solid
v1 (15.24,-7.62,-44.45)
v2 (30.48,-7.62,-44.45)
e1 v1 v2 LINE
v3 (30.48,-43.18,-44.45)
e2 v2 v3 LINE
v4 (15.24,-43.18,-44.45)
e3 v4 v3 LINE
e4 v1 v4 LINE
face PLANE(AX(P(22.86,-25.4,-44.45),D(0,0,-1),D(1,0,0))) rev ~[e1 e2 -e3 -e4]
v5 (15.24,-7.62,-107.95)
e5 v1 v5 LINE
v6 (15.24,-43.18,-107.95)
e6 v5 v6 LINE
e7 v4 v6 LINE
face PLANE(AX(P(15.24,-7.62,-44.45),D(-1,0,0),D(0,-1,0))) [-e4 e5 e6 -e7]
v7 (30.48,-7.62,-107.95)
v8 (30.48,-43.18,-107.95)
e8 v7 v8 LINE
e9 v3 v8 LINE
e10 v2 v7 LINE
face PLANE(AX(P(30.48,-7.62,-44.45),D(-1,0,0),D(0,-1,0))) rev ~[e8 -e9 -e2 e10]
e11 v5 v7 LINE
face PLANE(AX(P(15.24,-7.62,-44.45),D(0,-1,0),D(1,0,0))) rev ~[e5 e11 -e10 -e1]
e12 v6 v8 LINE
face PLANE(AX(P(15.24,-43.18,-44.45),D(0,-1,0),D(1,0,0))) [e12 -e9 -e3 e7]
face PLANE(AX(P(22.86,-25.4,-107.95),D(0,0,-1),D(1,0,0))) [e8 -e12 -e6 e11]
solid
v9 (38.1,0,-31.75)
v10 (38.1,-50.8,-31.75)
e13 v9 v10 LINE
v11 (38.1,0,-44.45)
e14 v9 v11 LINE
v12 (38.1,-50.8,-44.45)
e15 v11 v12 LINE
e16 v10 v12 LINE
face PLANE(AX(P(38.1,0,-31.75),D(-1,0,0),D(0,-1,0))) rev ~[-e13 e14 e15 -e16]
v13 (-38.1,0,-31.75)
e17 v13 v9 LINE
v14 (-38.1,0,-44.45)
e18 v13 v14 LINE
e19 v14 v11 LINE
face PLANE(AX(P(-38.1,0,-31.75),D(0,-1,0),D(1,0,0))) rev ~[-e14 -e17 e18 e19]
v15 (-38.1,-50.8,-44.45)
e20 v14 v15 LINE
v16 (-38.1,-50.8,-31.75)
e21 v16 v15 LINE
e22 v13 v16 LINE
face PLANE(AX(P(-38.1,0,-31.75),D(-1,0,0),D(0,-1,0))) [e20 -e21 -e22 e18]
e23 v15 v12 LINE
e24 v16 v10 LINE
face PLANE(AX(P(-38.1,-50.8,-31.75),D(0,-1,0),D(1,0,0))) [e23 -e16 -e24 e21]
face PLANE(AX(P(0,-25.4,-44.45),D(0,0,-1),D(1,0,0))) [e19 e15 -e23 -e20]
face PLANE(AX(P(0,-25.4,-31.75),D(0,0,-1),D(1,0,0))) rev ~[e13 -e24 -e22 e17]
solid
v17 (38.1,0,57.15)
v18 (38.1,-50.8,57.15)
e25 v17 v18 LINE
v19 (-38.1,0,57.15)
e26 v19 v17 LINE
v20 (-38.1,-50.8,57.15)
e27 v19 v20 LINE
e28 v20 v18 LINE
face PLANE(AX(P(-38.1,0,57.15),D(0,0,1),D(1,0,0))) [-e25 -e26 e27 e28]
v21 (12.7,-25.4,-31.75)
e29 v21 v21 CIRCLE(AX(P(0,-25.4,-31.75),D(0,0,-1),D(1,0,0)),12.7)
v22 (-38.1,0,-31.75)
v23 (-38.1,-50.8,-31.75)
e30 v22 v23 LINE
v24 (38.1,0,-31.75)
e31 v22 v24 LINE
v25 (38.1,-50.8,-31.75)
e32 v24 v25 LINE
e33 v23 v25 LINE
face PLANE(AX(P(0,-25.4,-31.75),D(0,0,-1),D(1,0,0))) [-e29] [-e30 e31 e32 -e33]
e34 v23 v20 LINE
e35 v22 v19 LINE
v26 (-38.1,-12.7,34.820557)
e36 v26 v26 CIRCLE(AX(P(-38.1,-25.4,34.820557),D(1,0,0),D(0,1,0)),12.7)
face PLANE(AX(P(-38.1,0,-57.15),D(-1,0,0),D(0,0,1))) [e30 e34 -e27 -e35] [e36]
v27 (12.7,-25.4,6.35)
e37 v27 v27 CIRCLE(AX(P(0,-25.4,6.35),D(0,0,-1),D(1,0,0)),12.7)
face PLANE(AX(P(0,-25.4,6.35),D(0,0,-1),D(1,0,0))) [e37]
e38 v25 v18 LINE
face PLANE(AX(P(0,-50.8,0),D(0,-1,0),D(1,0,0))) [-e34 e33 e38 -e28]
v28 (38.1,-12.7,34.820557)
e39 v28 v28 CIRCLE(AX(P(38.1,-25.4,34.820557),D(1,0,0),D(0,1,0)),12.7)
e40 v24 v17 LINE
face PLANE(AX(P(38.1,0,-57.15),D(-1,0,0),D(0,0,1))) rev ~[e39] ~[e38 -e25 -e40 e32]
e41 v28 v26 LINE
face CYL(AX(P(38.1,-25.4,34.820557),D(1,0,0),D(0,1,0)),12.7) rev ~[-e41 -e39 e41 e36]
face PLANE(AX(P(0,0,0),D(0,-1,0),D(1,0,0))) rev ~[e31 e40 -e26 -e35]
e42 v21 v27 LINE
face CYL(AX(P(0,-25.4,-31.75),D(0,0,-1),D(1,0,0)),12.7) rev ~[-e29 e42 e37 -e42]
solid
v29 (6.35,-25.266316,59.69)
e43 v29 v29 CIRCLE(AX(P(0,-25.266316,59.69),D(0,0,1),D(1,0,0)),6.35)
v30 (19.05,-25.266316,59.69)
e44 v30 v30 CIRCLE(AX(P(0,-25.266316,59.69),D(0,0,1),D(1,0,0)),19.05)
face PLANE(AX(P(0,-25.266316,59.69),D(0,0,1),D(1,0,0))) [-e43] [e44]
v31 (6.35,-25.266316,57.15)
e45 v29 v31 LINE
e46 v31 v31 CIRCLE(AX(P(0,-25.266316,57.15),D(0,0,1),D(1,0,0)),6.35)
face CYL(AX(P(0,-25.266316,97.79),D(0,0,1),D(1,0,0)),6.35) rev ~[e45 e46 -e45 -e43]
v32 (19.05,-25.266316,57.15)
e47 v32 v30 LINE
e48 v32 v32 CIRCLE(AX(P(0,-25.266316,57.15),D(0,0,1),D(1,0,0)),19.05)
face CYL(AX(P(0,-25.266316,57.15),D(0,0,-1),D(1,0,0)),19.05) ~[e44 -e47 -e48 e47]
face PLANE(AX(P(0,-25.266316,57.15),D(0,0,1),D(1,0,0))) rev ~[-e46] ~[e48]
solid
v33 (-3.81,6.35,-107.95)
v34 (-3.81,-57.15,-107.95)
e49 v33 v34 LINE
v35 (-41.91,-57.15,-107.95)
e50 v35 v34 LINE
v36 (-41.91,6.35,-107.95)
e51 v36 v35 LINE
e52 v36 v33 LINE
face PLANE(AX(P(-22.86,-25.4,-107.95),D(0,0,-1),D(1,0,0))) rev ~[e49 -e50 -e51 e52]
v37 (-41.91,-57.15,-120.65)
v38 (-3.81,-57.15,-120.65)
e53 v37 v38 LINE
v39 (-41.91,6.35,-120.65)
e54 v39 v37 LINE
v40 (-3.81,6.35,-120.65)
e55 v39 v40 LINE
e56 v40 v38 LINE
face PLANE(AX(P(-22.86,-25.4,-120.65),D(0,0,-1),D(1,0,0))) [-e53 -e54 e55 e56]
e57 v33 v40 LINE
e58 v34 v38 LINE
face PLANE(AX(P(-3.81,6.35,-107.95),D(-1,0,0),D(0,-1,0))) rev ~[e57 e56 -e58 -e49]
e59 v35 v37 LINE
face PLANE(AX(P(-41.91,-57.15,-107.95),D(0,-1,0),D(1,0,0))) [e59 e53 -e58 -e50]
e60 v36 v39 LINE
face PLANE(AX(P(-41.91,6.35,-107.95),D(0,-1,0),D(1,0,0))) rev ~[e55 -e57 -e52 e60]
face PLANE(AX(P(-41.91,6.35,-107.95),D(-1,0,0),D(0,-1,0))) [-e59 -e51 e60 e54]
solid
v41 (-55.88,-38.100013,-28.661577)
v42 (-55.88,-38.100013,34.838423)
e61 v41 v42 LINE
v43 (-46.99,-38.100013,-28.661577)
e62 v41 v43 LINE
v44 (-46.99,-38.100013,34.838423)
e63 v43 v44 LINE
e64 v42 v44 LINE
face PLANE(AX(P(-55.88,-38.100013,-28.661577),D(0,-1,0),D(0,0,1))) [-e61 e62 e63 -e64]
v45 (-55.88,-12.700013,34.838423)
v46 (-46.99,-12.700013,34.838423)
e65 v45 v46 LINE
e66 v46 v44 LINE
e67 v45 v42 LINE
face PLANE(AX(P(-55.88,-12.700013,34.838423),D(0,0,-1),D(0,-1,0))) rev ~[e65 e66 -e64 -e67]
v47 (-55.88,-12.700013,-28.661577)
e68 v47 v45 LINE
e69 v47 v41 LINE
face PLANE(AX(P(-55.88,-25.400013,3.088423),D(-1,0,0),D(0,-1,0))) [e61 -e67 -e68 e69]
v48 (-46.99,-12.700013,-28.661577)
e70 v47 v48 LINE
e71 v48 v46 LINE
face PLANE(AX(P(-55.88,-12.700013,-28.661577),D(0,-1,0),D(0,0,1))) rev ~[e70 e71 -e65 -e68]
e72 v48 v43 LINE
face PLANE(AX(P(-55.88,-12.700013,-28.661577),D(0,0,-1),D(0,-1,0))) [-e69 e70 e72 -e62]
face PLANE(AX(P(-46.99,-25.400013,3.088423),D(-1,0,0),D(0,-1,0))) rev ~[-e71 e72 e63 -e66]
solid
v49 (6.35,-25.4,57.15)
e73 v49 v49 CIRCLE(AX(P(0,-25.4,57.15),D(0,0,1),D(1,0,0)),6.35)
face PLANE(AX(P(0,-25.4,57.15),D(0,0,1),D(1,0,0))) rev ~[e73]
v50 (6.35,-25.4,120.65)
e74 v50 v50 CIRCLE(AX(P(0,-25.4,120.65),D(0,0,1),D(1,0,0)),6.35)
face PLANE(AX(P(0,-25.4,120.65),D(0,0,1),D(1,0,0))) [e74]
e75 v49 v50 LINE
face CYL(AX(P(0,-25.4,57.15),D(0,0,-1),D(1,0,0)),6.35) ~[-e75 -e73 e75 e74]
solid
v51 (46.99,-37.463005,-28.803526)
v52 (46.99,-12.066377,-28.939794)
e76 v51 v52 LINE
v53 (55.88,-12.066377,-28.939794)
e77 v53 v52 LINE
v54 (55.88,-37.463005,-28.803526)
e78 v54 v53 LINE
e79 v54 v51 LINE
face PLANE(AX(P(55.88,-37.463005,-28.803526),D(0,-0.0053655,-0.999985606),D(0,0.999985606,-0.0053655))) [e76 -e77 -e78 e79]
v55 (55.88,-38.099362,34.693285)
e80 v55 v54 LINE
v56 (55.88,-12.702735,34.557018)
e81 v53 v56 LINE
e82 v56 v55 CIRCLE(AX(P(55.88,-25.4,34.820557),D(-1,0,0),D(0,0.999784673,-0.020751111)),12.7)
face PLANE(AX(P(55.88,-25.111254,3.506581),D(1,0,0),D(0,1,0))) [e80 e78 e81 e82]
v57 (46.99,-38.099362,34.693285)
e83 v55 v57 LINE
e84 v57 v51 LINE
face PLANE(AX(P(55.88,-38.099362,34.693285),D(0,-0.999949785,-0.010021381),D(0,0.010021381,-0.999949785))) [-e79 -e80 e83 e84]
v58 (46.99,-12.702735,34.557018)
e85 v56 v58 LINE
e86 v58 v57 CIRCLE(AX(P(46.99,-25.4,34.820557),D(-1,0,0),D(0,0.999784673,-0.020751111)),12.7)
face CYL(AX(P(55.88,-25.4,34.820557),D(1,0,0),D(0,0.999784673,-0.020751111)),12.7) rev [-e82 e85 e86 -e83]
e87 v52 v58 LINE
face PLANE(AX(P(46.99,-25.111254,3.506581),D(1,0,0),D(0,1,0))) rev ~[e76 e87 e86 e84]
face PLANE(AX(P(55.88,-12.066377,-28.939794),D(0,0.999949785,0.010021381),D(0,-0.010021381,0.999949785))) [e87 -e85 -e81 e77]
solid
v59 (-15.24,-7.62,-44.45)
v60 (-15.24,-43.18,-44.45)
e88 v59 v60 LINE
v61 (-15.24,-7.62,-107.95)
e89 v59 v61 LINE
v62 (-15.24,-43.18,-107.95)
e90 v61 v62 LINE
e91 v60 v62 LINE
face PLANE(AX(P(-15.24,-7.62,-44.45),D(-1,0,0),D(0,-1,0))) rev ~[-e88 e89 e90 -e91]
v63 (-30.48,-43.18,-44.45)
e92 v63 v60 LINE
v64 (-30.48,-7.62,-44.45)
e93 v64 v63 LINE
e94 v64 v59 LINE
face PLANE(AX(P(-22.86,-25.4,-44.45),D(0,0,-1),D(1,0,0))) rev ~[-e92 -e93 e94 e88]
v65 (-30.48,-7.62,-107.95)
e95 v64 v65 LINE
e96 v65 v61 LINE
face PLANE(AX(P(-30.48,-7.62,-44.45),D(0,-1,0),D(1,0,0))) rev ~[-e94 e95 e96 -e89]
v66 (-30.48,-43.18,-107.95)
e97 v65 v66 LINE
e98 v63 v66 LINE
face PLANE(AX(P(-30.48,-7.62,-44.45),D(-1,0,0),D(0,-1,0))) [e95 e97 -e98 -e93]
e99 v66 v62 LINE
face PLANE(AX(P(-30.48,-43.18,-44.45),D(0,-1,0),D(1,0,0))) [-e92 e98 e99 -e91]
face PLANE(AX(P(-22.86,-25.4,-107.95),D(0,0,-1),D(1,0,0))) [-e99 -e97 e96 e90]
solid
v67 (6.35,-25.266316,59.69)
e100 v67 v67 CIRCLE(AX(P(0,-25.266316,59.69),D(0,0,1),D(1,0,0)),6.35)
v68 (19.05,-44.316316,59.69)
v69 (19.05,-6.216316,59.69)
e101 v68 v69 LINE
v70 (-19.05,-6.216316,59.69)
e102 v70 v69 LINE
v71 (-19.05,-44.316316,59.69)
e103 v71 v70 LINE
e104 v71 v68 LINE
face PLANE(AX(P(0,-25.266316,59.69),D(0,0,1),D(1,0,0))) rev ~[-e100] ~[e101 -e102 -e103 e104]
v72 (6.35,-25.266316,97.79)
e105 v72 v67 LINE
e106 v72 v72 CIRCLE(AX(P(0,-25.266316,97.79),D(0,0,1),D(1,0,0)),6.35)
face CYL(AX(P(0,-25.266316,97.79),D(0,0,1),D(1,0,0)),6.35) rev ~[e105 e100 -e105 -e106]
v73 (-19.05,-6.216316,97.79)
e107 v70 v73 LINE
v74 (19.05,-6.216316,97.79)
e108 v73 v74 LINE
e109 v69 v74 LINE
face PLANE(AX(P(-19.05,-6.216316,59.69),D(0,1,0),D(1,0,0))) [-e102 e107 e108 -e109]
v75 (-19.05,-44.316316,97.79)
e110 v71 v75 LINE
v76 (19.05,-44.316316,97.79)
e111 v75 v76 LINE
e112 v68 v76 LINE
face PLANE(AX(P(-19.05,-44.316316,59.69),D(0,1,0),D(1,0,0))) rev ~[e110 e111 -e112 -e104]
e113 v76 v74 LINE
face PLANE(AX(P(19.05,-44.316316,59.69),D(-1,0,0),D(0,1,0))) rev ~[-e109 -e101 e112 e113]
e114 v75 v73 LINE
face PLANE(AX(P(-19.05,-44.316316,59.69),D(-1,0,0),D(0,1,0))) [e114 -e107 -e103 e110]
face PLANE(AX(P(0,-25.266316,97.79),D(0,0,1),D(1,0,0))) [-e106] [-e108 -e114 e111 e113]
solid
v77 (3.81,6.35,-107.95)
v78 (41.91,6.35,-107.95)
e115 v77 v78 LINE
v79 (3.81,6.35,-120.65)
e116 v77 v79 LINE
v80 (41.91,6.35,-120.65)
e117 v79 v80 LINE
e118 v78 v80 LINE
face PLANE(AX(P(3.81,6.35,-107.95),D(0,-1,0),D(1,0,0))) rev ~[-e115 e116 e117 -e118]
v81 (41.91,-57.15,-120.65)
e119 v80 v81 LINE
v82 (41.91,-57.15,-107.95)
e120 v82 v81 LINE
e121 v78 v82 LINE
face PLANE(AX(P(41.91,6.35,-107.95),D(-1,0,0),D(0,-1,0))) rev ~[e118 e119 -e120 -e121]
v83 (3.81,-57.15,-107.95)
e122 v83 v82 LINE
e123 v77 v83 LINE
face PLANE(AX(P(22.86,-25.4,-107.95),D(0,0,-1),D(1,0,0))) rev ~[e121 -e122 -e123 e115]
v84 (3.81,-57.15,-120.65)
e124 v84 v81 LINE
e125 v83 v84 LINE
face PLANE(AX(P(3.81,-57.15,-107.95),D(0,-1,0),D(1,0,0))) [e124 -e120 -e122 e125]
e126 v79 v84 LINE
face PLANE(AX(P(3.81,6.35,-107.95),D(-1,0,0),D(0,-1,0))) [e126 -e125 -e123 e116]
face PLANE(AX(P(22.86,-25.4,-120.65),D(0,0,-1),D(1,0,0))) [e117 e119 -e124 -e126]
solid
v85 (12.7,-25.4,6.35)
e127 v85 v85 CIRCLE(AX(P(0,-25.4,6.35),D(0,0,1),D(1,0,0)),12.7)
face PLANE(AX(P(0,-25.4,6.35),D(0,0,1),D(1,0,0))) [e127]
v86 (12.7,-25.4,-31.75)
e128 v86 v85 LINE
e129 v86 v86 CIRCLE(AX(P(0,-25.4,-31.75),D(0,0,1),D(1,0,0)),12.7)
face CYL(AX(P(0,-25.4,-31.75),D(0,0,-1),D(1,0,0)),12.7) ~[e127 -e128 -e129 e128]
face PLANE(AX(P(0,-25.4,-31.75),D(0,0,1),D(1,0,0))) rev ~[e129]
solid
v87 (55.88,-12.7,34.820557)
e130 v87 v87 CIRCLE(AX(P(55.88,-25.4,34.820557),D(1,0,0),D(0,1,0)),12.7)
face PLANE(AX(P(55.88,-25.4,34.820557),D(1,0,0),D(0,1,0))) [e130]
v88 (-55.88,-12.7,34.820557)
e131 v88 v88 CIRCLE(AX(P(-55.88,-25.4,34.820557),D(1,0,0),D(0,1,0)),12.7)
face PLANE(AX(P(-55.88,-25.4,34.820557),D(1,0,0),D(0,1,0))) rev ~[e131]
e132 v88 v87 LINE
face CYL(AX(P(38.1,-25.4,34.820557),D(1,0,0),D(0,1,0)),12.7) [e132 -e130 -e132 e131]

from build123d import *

# Parameters (mm, degrees)
F0_W          = 76.2
F0_H          = 114.3
F1_DEPTH      = 50.8
F2_R          = 12.7
F3_DEPTH      = 76.2
F4_W          = 76.2
F4_H          = 50.8
F4_R          = 12.7
F5_DEPTH      = 25.4
F6_R          = 12.7
F7_DEPTH      = 38.1
F8_R          = 12.7
F9_DEPTH      = 17.78
F9_DEPTH_BACK = 93.98
F11_DEPTH     = 8.89
F12_W         = 25.4
F12_H         = 63.5
F13_DEPTH     = 8.89
F14_W         = 76.2
F14_H         = 50.8
F15_DEPTH     = 12.7
F16_W         = 15.24
F16_H         = 35.56
F17_DEPTH     = 63.5
F18_W         = 38.1
F18_H         = 63.5
F18_W_2       = 15.24
F18_H_2       = 35.56
F19_DEPTH     = 12.7
F20_R         = 19.05
F21_DEPTH     = 2.54
F22_W         = 38.1
F22_H         = 38.1
F23_DEPTH     = 38.1
F24_R         = 6.35
F25_DEPTH     = 40.64
F26_R         = 6.35
F27_DEPTH     = 63.5
F28_R         = 12.7
F29_DEPTH     = 38.1


# Not quite as in the source:
# - a feature of the source that left no trace in its solid (it failed there, or was rolled back) is left out


with BuildPart() as f1:
    # F0 (on Front) → F1 (new body)
    with BuildSketch(Plane.XZ):
        Rectangle(F0_W, F0_H)
    extrude(amount=F1_DEPTH)

    # F2 (on face) → F3 (cut)
    with BuildSketch(Plane.YZ.offset(38.1)):
        with Locations((-25.4, 34.8205566406)):
            Circle(F2_R)
    extrude(amount=-F3_DEPTH, mode=Mode.SUBTRACT)

    # F4 (on face) → F5 (cut)
    with BuildSketch(Plane(origin=(0, 0, -57.15), x_dir=(1, 0, 0), z_dir=(0, 0, -1))):
        with Locations((0, 25.4)):
            Rectangle(F4_W, F4_H)
        with Locations((0, 25.4)):
            Circle(F4_R, mode=Mode.SUBTRACT)
        with Locations((0, 25.4)):
            Circle(F4_R)
    extrude(amount=-F5_DEPTH, mode=Mode.SUBTRACT)

    # F6 (on face) → F7 (cut)
    with BuildSketch(Plane(origin=(0, 0, -31.75), x_dir=(1, 0, 0), z_dir=(0, 0, -1))):
        with Locations((0, 25.4)):
            Circle(F6_R)
    extrude(amount=-F7_DEPTH, mode=Mode.SUBTRACT)


with BuildPart() as f9:
    # F8 (on face) → F9 (new body, two sides)
    with BuildSketch(Plane.YZ.offset(38.1)) as f9_sk:
        with Locations((-25.4, 34.8205566406)):
            Circle(F8_R)
    extrude(amount=F9_DEPTH)
    extrude(f9_sk.sketch, amount=-F9_DEPTH_BACK)


with BuildPart() as f11:
    # F10 (on face) → F11 (new body)
    with BuildSketch(Plane.YZ.offset(55.88)):
        with BuildLine():
            ThreePointArc((-12.7027346591, 34.5570175282), (-25.4681418528, 22.1207394495), (-38.0993622657, 34.6932851007))
            Line((-38.0993622657, 34.6932851007), (-37.4630045663, -28.8035262277))
            Line((-37.4630045663, -28.8035262277), (-12.0663769597, -28.9397938002))
            Line((-12.0663769597, -28.9397938002), (-12.7027346591, 34.5570175282))
        make_face()
    extrude(amount=-F11_DEPTH)


with BuildPart() as f13:
    # F12 (on face) → F13 (new body)
    with BuildSketch(Plane(origin=(-55.88, 0, 0), x_dir=(0, -1, 0), z_dir=(-1, 0, 0))):
        with Locations((25.4000125671, 3.0884229026)):
            Rectangle(F12_W, F12_H)
    extrude(amount=-F13_DEPTH)


with BuildPart() as f15:
    # F14 (on face) → F15 (new body)
    with BuildSketch(Plane(origin=(0, 0, -31.75), x_dir=(1, 0, 0), z_dir=(0, 0, -1))):
        with Locations((0, 25.4)):
            Rectangle(F14_W, F14_H)
    extrude(amount=F15_DEPTH)


with BuildPart() as f17:
    # F16 (on face) → F17 (new body)
    with BuildSketch(Plane(origin=(0, 0, -44.45), x_dir=(1, 0, 0), z_dir=(0, 0, -1))):
        with Locations((-22.86, 25.4)):
            Rectangle(F16_W, F16_H)
    extrude(amount=F17_DEPTH)


with BuildPart() as f17b:
    # F16 (on face) → F17, piece 2 (new body)
    with BuildSketch(Plane(origin=(0, 0, -44.45), x_dir=(1, 0, 0), z_dir=(0, 0, -1))):
        with Locations((22.86, 25.4)):
            Rectangle(F16_W, F16_H)
    extrude(amount=F17_DEPTH)


with BuildPart() as f19:
    # F18 (on face) → F19 (new body)
    with BuildSketch(Plane(origin=(0, 0, -107.95), x_dir=(1, 0, 0), z_dir=(0, 0, -1))):
        with Locations((-22.86, 25.4)):
            Rectangle(F18_W, F18_H)
        with Locations((-22.86, 25.4)):
            Rectangle(F18_W_2, F18_H_2, mode=Mode.SUBTRACT)
        with Locations((-22.86, 25.4)):
            Rectangle(F18_W_2, F18_H_2)
    extrude(amount=F19_DEPTH)


with BuildPart() as f19b:
    # F18 (on face) → F19, piece 2 (new body)
    with BuildSketch(Plane(origin=(0, 0, -107.95), x_dir=(1, 0, 0), z_dir=(0, 0, -1))):
        with Locations((22.86, 25.4)):
            Rectangle(F18_W, F18_H)
    extrude(amount=F19_DEPTH)


with BuildPart() as f21:
    # F20 (on face) → F21 (new body)
    with BuildSketch(Plane.XY.offset(57.15)):
        with Locations((0, -25.266315788)):
            Circle(F20_R)
    extrude(amount=F21_DEPTH)


with BuildPart() as f23:
    # F22 (on face) → F23 (new body)
    with BuildSketch(Plane.XY.offset(59.69)):
        with Locations((0, -25.266315788)):
            Rectangle(F22_W, F22_H)
    extrude(amount=F23_DEPTH)


with BuildPart() as f25_tool:
    # F24 (on face) → F25 (new body)
    with BuildSketch(Plane.XY.offset(97.79)):
        with Locations((0, -25.266315788)):
            Circle(F24_R)
    extrude(amount=-F25_DEPTH)


with BuildPart() as f21_1:
    add(f21.part)

    # F25: cut by f25_tool
    add(f25_tool.part, mode=Mode.SUBTRACT)


with BuildPart() as f23_1:
    add(f23.part)

    # F25: cut by f25_tool
    add(f25_tool.part, mode=Mode.SUBTRACT)


with BuildPart() as f27:
    # F26 (on face) → F27 (new body)
    with BuildSketch(Plane.XY.offset(57.15)):
        with Locations((0, -25.4)):
            Circle(F26_R)
    extrude(amount=F27_DEPTH)


with BuildPart() as f29:
    # F28 (on face) → F29 (new body)
    with BuildSketch(Plane.XY.offset(-31.75)):
        with Locations((0, -25.4)):
            Circle(F28_R)
    extrude(amount=F29_DEPTH)


solid = Compound([f1.part, f9.part, f11.part, f13.part, f15.part, f17.part, f17b.part, f19.part, f19b.part, f21_1.part, f23_1.part, f27.part, f29.part])
